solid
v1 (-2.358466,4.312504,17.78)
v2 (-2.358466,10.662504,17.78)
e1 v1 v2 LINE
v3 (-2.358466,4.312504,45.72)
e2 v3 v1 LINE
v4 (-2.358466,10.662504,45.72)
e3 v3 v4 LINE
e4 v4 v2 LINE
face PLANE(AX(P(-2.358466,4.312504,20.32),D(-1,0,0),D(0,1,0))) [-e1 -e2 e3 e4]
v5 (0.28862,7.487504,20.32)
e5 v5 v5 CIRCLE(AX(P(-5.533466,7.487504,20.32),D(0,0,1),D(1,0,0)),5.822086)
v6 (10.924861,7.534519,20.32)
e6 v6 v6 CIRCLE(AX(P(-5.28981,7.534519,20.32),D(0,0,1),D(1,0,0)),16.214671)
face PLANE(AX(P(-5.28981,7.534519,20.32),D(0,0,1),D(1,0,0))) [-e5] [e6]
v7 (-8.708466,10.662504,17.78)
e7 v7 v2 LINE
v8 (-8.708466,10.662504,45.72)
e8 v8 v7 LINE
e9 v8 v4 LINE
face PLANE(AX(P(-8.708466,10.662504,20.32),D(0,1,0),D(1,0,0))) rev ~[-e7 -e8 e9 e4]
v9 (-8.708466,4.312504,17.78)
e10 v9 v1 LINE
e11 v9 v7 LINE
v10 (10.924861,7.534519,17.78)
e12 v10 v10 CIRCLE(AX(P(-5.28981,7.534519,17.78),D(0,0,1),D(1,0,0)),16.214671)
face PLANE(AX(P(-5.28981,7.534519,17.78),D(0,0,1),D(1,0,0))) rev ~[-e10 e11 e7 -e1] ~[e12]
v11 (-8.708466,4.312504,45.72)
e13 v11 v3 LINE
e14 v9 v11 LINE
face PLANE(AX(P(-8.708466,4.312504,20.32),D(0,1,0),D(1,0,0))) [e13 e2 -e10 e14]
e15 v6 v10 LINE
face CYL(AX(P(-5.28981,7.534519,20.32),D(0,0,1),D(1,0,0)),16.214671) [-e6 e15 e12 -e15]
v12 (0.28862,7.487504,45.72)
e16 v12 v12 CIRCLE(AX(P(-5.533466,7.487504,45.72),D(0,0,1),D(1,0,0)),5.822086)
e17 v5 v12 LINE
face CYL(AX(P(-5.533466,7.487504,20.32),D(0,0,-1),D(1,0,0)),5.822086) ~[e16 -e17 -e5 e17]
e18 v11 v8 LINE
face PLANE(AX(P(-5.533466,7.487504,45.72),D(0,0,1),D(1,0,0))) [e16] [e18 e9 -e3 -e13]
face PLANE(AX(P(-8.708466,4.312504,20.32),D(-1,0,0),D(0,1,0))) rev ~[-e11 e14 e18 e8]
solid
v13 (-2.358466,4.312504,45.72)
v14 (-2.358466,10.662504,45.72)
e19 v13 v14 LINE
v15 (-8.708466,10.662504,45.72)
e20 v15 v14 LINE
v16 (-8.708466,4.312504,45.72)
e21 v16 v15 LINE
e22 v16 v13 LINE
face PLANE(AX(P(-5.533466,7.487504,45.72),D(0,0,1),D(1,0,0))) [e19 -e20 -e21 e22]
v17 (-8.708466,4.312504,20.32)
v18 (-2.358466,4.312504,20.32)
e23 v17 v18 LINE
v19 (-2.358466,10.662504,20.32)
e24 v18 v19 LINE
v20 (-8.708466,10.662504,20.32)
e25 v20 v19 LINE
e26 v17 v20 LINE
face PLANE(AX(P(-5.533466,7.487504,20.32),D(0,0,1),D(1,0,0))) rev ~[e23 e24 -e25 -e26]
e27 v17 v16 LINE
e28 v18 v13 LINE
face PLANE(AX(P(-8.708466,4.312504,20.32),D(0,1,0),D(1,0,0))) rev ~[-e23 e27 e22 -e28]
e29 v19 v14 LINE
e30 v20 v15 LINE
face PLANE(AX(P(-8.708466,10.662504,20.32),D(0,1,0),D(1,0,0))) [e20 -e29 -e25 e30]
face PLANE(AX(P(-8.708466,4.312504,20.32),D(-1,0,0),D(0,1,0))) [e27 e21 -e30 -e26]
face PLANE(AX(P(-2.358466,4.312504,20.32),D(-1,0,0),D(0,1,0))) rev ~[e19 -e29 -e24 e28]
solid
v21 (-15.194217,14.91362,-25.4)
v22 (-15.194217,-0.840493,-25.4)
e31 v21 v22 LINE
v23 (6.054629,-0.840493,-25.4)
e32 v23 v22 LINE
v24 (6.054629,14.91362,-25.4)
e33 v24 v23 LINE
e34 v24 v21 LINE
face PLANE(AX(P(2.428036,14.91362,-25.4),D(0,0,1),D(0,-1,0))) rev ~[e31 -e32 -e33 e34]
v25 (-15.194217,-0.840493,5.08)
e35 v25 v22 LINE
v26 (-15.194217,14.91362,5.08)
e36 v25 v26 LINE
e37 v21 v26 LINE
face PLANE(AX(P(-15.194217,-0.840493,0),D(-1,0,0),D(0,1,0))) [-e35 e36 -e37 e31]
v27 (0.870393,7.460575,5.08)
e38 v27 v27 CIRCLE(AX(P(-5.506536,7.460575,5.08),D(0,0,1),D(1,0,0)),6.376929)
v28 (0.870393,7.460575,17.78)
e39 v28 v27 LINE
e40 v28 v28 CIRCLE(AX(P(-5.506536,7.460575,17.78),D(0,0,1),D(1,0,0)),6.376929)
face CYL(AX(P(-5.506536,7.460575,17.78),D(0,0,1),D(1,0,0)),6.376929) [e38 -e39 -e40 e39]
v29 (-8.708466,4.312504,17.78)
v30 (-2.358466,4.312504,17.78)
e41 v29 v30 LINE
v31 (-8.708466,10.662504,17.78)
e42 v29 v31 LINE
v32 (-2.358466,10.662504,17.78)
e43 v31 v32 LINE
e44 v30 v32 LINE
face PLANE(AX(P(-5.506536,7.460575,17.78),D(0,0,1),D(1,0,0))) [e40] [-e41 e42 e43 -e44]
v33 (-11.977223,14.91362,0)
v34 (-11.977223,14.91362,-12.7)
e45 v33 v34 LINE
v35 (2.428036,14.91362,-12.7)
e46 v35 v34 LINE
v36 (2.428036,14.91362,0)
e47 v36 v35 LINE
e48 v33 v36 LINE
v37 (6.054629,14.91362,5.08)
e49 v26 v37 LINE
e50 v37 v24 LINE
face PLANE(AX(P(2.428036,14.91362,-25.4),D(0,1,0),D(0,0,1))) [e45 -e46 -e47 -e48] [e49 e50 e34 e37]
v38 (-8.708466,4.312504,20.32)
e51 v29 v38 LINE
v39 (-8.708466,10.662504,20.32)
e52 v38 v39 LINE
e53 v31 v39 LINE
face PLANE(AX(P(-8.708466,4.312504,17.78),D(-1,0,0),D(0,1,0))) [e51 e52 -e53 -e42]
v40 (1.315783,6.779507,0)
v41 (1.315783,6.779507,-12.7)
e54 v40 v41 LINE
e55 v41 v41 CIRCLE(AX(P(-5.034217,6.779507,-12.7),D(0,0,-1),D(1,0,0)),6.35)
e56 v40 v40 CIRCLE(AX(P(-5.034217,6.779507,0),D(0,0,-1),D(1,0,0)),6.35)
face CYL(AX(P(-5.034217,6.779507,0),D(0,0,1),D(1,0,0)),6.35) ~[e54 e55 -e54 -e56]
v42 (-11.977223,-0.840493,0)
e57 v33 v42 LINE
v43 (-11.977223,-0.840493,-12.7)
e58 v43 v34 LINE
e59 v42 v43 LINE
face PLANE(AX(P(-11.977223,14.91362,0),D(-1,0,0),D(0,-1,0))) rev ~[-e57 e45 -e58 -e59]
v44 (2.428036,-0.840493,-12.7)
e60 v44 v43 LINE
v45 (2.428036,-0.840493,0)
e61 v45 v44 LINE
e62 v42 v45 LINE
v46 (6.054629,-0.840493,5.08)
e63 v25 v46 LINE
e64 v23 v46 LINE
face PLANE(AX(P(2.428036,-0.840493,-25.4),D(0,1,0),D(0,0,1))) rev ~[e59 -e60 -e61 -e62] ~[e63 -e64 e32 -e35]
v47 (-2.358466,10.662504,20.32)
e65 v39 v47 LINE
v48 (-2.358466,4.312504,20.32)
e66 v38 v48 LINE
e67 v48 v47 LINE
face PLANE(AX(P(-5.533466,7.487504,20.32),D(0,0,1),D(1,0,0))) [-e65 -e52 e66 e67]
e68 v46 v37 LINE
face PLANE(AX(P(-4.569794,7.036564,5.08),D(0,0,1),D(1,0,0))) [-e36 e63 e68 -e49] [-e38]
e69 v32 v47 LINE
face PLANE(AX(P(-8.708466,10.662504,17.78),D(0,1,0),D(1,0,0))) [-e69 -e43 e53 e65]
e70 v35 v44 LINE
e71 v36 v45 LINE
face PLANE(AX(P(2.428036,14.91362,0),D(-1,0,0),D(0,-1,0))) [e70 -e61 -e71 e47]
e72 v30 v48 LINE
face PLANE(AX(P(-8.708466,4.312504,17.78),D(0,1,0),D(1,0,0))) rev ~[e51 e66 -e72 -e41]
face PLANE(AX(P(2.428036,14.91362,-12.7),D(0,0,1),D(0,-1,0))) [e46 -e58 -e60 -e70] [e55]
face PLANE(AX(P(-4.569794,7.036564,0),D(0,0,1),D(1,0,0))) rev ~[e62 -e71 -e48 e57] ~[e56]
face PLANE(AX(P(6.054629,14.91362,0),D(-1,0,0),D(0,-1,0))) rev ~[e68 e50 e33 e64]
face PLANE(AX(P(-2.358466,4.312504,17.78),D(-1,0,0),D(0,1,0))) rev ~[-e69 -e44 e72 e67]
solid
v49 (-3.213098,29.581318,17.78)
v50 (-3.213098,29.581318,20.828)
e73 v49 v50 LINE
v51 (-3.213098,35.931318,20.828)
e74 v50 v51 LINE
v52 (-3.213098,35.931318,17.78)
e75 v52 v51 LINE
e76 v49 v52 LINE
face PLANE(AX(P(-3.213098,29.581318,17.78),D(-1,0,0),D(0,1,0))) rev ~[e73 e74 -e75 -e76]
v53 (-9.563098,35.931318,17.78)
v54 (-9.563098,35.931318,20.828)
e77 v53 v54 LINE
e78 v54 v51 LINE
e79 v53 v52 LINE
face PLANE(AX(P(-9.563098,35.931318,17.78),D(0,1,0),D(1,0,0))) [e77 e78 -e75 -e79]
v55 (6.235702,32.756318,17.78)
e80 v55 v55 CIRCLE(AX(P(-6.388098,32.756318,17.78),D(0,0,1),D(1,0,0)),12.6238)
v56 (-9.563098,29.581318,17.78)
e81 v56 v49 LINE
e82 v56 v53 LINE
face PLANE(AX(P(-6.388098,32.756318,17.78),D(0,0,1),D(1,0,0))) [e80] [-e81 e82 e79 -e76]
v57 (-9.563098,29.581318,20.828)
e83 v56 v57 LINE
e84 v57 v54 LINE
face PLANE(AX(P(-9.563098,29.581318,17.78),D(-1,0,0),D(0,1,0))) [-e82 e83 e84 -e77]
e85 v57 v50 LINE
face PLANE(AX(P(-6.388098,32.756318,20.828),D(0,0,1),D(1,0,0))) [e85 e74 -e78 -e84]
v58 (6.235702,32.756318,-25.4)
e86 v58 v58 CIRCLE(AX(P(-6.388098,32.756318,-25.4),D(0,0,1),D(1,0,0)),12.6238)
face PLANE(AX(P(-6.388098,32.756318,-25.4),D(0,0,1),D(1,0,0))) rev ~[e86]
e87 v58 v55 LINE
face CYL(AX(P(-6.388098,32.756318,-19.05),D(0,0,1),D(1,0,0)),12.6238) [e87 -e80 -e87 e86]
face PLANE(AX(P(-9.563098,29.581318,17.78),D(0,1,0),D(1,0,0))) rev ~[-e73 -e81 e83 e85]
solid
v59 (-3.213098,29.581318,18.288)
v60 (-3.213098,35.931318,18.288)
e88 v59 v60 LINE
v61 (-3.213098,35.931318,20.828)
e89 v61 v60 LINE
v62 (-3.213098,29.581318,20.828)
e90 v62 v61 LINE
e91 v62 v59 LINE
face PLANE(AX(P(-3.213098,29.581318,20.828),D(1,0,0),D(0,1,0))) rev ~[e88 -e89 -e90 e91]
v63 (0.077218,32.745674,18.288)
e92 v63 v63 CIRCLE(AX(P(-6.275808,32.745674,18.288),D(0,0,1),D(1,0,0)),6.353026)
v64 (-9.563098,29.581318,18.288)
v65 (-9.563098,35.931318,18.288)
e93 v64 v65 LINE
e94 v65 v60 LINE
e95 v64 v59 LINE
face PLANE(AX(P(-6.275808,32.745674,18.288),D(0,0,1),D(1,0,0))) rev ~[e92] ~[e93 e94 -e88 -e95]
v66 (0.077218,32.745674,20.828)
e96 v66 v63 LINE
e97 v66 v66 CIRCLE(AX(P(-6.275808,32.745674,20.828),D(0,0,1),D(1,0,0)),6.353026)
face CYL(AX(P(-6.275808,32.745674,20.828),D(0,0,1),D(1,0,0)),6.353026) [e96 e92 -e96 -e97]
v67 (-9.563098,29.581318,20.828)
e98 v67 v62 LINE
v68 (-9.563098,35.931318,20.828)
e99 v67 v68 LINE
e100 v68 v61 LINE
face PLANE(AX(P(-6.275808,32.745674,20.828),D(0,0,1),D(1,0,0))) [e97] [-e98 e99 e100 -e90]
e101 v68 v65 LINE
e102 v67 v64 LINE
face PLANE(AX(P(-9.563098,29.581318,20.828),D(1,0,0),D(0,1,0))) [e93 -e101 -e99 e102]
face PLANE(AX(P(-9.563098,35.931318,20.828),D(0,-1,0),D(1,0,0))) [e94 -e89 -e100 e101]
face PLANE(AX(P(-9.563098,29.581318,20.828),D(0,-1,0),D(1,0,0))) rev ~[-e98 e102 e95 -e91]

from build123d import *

# Parameters (mm, degrees)
F0_R      = 12.6238
F1_DEPTH  = 17.78
F0_R_2    = 4.2291
F2_R      = 6.376929238
F2_R_2    = 4.2291
F3_DEPTH  = 12.7
F4_W      = 21.2488458492
F4_H      = 15.7541136723
F5_DEPTH  = 5.08
F6_W      = 6.35
F6_H      = 6.35
F7_DEPTH  = 2.54
F8_W      = 6.35
F8_H      = 6.35
F9_DEPTH  = 3.048
F10_R     = 16.2146713523
F10_W     = 6.35
F10_H     = 6.35
F11_DEPTH = 2.54
F12_R     = 6.3530257629
F12_W     = 6.35
F12_H     = 6.35
F13_DEPTH = 2.54
F14_R     = 5.8220855013
F14_W     = 6.35
F14_H     = 6.35
F15_DEPTH = 25.4
F16_DEPTH = 25.4
F17_DEPTH = 19.05
F18_R     = 6.35
F19_DEPTH = 12.7
F20_W     = 3.6265931558
F20_H     = 15.7541136723
F20_W_2   = 3.216993995
F21_DEPTH = 25.4
F22_DEPTH = 6.35
F23_W     = 15.7541136723
F23_H     = 12.7
F24_DEPTH = 15.24


with BuildPart() as f1:
    # F0 (on Top) → F1 (new body)
    with BuildSketch(Plane.XY):
        with Locations((-6.3880984679, 32.7563181388)):
            Circle(F0_R)
    extrude(amount=F1_DEPTH)

    # F8 (on face) → F9 (join)
    with BuildSketch(Plane.XY.offset(17.78)):
        with Locations((-6.3880984679, 32.7563181388)):
            Rectangle(F8_W, F8_H)
    extrude(amount=F9_DEPTH)

    # F17 (add): a face of the model
    f17_faces = [f1.faces().sort_by_distance(p)[0] for p in [
        (-6.3880984679, 32.7563181388, 0),
    ]]
    extrude(f17_faces, amount=F17_DEPTH)

    # F22 (add): a face of the model
    f22_faces = [f1.faces().sort_by_distance(p)[0] for p in [
        (-6.3880984679, 32.7563181388, -19.05),
    ]]
    extrude(f22_faces, amount=F22_DEPTH)


with BuildPart() as f1b:
    # F0 (on Top) → F1, piece 2 (new body)
    with BuildSketch(Plane.XY):
        with Locations((-5.5065363796, 7.4605747914)):
            Circle(F0_R_2)
    extrude(amount=F1_DEPTH)

    # F2 (on face) → F3 (join)
    with BuildSketch(Plane.XY.offset(17.78)):
        with Locations((-5.5065363796, 7.4605747914)):
            Circle(F2_R)
        with Locations((-5.5065363796, 7.4605747914)):
            Circle(F2_R_2, mode=Mode.SUBTRACT)
    extrude(amount=-F3_DEPTH)

    # F4 (on Top) → F5 (join)
    with BuildSketch(Plane.XY):
        with Locations((-4.5697938185, 7.0365635911)):
            Rectangle(F4_W, F4_H)
    extrude(amount=F5_DEPTH)

    # F6 (on face) → F7 (join)
    with BuildSketch(Plane.XY.offset(17.78)):
        with Locations((-5.5334656176, 7.4875040295)):
            Rectangle(F6_W, F6_H)
    extrude(amount=F7_DEPTH)


with BuildPart() as f11:
    # F10 (on face) → F11 (new body)
    with BuildSketch(Plane.XY.offset(20.32)):
        with Locations((-5.289810244, 7.5345193036)):
            Circle(F10_R)
        with Locations((-5.5334656176, 7.4875040295)):
            Rectangle(F10_W, F10_H, mode=Mode.SUBTRACT)
    extrude(amount=-F11_DEPTH)

    # F14 (on face) → F15 (join)
    with BuildSketch(Plane.XY.offset(20.32)):
        with Locations((-5.5334656176, 7.4875040295)):
            Circle(F14_R)
        with Locations((-5.5334656176, 7.4875040295)):
            Rectangle(F14_W, F14_H, mode=Mode.SUBTRACT)
    extrude(amount=F15_DEPTH)


with BuildPart() as f13:
    # F12 (on face) → F13 (new body)
    with BuildSketch(Plane.XY.offset(20.828)):
        with Locations((-6.275807973, 32.7456742525)):
            Circle(F12_R)
        with Locations((-6.3880984679, 32.7563181388)):
            Rectangle(F12_W, F12_H, mode=Mode.SUBTRACT)
    extrude(amount=-F13_DEPTH)


with BuildPart() as f16:
    # F16 (new): a face of the model
    f16_faces = [f1b.part.faces().sort_by_distance(p)[0] for p in [
        (-5.5334656176, 7.4875040295, 20.32),
    ]]
    extrude(f16_faces, amount=F16_DEPTH)


with BuildPart() as f1b_1:
    add(f1b.part)

    # F18 (on face) → F19 (join)
    with BuildSketch(Plane(origin=(0, 0, 0), x_dir=(1, 0, 0), z_dir=(0, 0, -1))):
        with Locations((-5.0342167431, -6.7795067549)):
            Circle(F18_R)
    extrude(amount=F19_DEPTH)

    # F20 (on face) → F21 (join)
    with BuildSketch(Plane(origin=(0, 0, 0), x_dir=(1, 0, 0), z_dir=(0, 0, -1))):
        with Locations((4.2413325282, -7.0365635911)):
            Rectangle(F20_W, F20_H)
        with Locations((-13.5857197456, -7.0365635911)):
            Rectangle(F20_W_2, F20_H)
    extrude(amount=F21_DEPTH)

    # F23 (on face) → F24 (join)
    with BuildSketch(Plane(origin=(2.4280359503, 0, 0), x_dir=(0, -1, 0), z_dir=(-1, 0, 0))):
        with Locations((-7.0365635911, -19.05)):
            Rectangle(F23_W, F23_H)
    extrude(amount=F24_DEPTH)


solid = Compound([f1.part, f11.part, f13.part, f16.part, f1b_1.part])
